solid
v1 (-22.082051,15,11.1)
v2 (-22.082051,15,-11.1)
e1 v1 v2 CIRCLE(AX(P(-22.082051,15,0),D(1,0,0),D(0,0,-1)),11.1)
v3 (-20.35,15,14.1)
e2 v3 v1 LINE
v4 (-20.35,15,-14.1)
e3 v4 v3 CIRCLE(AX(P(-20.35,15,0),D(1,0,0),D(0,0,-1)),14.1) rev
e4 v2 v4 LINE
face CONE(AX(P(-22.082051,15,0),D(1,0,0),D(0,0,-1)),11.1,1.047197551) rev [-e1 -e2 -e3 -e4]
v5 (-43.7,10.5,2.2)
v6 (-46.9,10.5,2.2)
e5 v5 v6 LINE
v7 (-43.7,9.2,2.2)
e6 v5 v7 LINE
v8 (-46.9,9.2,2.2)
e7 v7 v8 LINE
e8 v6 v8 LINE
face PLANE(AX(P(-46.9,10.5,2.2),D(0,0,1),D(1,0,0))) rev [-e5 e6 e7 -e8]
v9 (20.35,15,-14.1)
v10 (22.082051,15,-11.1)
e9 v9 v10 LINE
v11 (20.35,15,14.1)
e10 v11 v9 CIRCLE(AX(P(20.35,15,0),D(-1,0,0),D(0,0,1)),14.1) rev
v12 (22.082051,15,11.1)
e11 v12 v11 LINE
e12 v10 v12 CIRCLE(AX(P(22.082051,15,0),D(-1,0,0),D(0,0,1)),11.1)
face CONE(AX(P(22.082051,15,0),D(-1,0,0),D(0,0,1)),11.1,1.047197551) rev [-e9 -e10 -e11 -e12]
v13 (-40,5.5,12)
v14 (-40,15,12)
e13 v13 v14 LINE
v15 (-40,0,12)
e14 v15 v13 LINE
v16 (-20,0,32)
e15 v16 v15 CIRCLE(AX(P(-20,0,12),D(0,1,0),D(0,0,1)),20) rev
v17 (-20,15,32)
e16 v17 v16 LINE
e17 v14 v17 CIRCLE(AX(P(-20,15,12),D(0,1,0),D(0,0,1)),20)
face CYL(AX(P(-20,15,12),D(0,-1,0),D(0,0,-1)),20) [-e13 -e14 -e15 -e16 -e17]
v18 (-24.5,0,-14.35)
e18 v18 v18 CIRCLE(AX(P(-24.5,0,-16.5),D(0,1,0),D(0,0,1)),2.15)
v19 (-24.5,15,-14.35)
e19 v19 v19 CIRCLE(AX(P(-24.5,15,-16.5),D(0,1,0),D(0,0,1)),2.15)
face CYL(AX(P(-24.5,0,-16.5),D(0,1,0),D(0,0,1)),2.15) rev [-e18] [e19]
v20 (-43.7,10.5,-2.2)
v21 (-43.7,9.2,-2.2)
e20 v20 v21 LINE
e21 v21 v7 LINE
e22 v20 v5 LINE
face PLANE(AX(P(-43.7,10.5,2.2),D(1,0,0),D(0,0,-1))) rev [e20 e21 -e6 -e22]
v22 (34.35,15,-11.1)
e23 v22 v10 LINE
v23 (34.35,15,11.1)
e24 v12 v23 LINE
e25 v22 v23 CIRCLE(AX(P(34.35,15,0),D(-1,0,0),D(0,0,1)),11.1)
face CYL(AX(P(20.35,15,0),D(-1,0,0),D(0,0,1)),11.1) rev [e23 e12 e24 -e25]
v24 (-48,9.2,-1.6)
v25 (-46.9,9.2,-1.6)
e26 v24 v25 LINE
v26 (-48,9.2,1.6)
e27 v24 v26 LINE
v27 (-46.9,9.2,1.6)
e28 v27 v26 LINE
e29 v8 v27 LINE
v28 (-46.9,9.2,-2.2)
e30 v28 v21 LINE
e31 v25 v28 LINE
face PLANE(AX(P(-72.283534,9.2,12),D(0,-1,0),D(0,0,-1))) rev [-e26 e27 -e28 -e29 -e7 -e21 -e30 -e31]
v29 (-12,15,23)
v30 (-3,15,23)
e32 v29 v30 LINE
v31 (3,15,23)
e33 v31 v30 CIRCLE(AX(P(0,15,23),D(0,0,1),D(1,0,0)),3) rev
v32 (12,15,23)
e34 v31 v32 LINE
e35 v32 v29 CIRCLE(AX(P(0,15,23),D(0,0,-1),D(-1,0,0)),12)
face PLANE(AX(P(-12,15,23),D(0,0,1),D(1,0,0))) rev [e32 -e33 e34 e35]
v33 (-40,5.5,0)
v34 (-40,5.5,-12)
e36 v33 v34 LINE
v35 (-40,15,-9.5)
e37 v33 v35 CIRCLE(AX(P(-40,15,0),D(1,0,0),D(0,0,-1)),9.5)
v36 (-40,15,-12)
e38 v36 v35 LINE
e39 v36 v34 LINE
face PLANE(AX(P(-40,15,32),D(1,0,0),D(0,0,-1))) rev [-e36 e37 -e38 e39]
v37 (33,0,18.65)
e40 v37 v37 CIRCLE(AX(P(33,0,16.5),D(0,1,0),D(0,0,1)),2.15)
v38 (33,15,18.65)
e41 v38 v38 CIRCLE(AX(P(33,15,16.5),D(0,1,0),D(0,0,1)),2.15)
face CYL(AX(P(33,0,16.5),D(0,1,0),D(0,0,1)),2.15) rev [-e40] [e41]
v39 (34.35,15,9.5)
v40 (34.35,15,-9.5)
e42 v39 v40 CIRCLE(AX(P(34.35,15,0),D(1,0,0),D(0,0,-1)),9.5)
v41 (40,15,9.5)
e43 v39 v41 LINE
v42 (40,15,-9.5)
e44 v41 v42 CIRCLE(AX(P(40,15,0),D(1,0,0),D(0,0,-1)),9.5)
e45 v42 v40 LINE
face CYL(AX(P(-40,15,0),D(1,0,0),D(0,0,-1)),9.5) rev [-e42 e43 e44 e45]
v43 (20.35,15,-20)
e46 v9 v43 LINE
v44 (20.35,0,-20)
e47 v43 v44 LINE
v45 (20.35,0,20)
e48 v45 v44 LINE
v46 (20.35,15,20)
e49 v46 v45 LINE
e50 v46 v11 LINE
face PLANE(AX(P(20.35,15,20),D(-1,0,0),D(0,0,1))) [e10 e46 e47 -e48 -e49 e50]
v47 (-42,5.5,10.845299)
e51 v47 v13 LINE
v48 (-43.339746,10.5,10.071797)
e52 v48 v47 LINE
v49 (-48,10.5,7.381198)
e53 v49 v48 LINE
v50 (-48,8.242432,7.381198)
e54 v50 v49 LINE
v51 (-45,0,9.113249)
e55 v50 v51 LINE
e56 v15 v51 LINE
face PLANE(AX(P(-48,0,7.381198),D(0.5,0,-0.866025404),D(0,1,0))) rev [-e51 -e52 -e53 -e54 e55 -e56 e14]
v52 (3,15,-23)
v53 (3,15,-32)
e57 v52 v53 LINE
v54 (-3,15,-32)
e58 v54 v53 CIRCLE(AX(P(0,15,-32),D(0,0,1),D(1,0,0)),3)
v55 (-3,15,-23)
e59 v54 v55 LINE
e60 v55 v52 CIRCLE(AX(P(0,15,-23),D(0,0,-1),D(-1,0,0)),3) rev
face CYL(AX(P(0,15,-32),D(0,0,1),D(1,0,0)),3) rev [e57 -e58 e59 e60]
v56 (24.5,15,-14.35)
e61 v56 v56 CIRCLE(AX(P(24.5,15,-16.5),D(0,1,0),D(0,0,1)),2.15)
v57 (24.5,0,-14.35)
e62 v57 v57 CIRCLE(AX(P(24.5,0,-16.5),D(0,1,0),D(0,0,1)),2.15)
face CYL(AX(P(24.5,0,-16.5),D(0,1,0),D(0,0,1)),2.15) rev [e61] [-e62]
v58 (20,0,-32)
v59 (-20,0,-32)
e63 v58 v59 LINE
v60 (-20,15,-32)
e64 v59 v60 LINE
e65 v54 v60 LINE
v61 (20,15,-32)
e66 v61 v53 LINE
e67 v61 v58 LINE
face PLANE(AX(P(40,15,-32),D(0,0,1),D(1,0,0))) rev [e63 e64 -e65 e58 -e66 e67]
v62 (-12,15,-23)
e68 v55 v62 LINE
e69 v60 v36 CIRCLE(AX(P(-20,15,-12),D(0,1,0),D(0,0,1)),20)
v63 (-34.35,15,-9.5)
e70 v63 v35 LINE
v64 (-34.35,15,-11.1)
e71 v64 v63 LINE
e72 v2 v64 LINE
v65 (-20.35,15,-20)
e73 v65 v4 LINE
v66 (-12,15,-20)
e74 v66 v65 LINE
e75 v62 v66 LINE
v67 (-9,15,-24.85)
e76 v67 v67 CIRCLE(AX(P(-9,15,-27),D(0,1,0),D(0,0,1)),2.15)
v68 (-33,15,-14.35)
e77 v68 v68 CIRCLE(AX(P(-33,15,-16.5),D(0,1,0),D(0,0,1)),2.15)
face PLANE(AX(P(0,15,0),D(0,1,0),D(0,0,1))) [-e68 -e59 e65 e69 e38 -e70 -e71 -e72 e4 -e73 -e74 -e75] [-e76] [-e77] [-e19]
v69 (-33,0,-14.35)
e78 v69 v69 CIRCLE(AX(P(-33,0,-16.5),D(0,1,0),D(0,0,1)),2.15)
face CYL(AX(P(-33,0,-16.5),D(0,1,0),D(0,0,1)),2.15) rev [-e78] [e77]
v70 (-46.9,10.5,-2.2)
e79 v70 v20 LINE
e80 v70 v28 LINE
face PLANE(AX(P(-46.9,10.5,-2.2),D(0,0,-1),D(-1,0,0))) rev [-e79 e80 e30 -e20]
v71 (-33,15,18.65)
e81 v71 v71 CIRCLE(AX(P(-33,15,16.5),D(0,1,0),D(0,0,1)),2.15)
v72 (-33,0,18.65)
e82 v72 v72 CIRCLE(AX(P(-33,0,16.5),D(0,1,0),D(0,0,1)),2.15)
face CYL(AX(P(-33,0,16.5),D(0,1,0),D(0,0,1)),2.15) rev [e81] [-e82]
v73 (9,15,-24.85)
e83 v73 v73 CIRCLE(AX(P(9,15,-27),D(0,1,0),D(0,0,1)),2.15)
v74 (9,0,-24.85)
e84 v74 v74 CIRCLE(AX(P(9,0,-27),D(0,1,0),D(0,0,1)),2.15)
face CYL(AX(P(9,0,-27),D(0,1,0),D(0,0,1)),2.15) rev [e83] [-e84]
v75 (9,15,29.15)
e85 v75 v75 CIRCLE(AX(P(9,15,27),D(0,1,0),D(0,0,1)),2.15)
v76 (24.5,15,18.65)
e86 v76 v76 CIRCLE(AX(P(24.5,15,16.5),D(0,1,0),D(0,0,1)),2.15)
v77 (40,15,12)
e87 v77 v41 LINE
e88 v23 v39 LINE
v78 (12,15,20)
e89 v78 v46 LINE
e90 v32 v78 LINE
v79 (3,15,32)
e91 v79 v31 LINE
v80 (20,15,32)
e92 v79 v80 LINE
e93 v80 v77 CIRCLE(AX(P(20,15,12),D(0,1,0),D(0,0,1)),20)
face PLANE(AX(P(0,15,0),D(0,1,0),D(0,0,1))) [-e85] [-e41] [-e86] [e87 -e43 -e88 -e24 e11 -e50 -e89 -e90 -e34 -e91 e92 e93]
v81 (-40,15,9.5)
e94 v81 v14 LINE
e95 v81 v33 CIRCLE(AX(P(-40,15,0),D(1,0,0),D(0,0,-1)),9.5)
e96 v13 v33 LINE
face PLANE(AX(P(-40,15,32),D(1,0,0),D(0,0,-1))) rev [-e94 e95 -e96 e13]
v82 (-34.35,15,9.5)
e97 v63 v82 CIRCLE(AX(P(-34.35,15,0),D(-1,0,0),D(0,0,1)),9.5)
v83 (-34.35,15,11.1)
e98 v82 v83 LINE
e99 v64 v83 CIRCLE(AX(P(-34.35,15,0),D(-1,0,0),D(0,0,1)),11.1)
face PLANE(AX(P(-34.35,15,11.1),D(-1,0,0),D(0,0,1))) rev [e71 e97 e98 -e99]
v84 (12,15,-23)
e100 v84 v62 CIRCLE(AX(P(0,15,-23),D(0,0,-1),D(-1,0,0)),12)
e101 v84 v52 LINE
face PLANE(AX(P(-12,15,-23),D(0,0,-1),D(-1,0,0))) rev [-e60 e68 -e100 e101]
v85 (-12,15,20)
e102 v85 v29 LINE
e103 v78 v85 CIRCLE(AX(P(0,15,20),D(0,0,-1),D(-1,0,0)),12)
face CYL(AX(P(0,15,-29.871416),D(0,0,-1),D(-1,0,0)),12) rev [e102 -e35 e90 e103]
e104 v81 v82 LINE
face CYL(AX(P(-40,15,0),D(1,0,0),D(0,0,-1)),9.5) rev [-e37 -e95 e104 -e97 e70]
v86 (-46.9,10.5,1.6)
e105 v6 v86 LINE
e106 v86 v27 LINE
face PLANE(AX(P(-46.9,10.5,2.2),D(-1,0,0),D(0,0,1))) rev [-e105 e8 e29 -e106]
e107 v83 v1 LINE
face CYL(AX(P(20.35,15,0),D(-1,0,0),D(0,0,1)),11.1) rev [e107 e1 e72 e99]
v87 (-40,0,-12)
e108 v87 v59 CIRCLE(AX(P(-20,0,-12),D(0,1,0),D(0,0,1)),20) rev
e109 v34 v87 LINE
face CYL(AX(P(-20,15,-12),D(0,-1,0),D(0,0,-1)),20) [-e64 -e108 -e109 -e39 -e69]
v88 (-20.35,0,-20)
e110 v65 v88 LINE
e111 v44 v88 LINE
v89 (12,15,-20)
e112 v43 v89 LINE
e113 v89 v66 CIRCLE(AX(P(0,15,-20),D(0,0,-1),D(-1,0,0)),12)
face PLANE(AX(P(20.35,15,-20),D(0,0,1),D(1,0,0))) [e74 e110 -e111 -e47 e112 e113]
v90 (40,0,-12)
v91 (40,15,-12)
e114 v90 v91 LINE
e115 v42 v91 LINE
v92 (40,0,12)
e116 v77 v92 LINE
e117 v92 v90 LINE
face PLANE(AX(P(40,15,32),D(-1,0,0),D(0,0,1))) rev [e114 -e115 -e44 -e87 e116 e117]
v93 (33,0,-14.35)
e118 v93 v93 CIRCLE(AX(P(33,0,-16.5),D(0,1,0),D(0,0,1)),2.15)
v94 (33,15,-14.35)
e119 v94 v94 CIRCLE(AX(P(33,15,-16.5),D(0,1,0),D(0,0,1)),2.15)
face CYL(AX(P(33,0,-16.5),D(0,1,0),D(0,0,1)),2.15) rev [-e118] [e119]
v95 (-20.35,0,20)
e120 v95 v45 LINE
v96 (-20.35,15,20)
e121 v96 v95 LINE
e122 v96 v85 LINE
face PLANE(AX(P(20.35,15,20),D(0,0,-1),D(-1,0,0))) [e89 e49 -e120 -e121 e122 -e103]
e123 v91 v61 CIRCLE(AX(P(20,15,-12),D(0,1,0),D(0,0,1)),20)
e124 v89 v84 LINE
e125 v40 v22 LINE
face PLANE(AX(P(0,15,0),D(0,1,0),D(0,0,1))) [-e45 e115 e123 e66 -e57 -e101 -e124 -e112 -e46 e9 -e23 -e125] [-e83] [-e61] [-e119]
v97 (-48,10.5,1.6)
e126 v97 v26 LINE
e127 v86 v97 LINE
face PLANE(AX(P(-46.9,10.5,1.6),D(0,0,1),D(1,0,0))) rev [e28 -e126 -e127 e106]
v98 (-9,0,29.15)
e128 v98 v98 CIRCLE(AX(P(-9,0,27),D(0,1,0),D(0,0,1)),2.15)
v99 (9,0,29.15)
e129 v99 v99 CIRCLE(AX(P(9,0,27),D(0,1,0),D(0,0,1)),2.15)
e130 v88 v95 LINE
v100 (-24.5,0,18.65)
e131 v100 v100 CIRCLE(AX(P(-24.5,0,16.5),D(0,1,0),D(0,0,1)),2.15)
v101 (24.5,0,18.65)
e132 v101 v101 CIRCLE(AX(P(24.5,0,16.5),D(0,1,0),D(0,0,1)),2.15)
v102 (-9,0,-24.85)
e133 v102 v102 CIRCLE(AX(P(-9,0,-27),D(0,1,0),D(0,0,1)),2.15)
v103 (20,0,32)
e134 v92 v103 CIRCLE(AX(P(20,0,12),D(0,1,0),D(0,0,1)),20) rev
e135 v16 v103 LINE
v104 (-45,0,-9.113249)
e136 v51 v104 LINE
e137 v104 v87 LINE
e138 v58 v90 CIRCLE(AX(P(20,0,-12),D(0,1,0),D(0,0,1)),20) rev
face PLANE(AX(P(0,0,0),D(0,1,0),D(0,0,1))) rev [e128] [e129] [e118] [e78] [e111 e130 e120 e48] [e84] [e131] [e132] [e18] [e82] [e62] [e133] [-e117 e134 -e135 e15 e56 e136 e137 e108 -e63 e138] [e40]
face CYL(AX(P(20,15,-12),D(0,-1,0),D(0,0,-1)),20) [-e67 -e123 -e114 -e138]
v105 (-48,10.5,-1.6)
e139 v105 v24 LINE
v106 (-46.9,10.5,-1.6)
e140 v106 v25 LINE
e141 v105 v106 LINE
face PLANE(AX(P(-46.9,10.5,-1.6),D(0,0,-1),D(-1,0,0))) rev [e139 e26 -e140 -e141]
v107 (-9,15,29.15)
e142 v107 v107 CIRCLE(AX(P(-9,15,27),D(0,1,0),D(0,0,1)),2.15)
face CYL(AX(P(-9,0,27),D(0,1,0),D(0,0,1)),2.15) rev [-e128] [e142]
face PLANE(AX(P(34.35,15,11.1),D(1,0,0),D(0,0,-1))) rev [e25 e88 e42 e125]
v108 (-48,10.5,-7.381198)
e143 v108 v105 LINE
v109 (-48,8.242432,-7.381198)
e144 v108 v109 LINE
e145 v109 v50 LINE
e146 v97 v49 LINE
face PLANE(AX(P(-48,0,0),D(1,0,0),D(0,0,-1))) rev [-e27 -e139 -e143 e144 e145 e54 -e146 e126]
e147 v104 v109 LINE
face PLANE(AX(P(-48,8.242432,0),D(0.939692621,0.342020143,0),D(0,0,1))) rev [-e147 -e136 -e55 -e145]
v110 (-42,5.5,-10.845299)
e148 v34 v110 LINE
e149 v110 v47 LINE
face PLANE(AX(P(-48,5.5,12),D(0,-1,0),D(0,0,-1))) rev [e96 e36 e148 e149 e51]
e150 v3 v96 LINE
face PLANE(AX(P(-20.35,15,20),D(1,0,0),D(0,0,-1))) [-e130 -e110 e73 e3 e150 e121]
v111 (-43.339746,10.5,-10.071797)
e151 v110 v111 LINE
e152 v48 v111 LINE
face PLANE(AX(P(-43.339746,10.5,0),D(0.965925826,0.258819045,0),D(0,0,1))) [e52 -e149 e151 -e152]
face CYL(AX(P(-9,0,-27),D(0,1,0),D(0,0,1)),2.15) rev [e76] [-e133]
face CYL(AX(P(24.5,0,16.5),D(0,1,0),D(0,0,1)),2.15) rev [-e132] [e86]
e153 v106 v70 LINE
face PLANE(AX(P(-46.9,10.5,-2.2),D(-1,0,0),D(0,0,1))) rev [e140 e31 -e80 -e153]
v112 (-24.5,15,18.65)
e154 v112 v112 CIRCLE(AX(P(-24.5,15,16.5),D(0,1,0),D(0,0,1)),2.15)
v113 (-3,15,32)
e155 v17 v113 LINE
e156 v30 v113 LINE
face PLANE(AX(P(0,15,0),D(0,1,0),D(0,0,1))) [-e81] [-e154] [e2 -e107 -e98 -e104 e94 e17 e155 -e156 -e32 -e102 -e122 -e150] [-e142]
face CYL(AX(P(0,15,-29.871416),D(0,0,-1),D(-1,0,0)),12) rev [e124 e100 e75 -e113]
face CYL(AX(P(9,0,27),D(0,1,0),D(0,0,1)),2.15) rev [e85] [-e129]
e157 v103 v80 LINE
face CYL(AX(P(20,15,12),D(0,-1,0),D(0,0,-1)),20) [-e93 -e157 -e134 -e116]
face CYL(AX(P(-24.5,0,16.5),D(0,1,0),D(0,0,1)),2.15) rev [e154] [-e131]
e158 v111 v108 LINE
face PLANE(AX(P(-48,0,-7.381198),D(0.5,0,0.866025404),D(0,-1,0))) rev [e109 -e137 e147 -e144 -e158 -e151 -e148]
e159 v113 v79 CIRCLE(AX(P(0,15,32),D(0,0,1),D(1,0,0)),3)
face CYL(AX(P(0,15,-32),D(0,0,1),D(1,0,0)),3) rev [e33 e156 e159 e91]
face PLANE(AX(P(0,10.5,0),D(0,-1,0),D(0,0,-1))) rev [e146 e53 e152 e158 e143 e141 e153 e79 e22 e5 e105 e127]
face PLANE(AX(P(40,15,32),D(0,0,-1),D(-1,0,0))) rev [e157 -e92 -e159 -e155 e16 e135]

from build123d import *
from OCP.BRepFilletAPI import BRepFilletAPI_MakeChamfer

# Parameters (mm, degrees)
SKETCH1_W           = 80
SKETCH1_H           = 64
SKETCH1_W_2         = 40.7
SKETCH1_H_2         = 40
BOSS_EXTRUDE1_DEPTH = 15
SKETCH3_W           = 14
SKETCH3_H           = 11.1
SKETCH4_R           = 9.5
CUT_EXTRUDE2_DEPTH  = 88.458561616
SKETCH5_R           = 3
CUT_EXTRUDE3_DEPTH  = 77.948034413
SKETCH8_R           = 2.15
CUT_EXTRUDE6_DEPTH  = 54.37602458
FILLET1_R           = 20
CHAMFER1_SIZE       = 3
CHAMFER1_SIZE2      = 1.732050808
SKETCH9_W           = 12
SKETCH9_H           = 3
SKETCH10_W          = 24
SKETCH10_H          = 5.5
BOSS_EXTRUDE2_DEPTH = 8
BOSS_EXTRUDE3_START = 2
SKETCH12_W          = 24
SKETCH12_H          = 3.7
BOSS_EXTRUDE3_DEPTH = 6
BOSS_EXTRUDE4_DEPTH = 1.3
CHAMFER2_SIZE2      = 1.339745962
CHAMFER2_SIZE       = 5
CHAMFER3_SIZE       = 8
CHAMFER3_SIZE_2     = 4.618802154
CHAMFER4_SIZE       = 3
CHAMFER4_SIZE2      = 8.242432258


with BuildPart() as part:
    # Sketch1 → Boss-Extrude1 (new body)
    with BuildSketch(Plane(origin=(0, 0, 0), x_dir=(1, 0, 0), z_dir=(0, 1, 0))):
        Rectangle(SKETCH1_W, SKETCH1_H)
        Rectangle(SKETCH1_W_2, SKETCH1_H_2, mode=Mode.SUBTRACT)
    extrude(amount=BOSS_EXTRUDE1_DEPTH)

    # Sketch3 → Cut-Revolve1 (revolve, cut)
    with BuildSketch(Plane(origin=(0, 15, 0), x_dir=(1, 0, 0), z_dir=(0, 1, 0))):
        with Locations((27.35, -5.55)):
            Rectangle(SKETCH3_W, SKETCH3_H)
        with Locations((-27.35, -5.55)):
            Rectangle(SKETCH3_W, SKETCH3_H)
    revolve(axis=Axis((20.35, 15, 0), (1, 0, 0)), mode=Mode.SUBTRACT)

    # Sketch4 → Cut-Extrude2 (cut, through all)
    with BuildSketch(Plane(origin=(40, 0, 0), x_dir=(0, 0, -1), z_dir=(1, 0, 0))):
        with Locations((0, 15)):
            Circle(SKETCH4_R)
    extrude(amount=-CUT_EXTRUDE2_DEPTH, mode=Mode.SUBTRACT)

    # Sketch5 → Cut-Extrude3 (cut, through all)
    with BuildSketch(Plane.XY.offset(32)):
        with Locations((0, 15)):
            Circle(SKETCH5_R)
    extrude(amount=-CUT_EXTRUDE3_DEPTH, mode=Mode.SUBTRACT)

    # Sketch8 → Cut-Extrude6 (cut, through all)
    with BuildSketch(Plane(origin=(0, 15, 0), x_dir=(1, 0, 0), z_dir=(0, 1, 0))):
        with Locations(Location((24.5, 16.5, 0), (0, 0, 270))):
            Circle(SKETCH8_R)
        with Locations(Location((24.5, -16.5, 0), (0, 0, 270))):
            Circle(SKETCH8_R)
        with Locations(Location((-24.5, -16.5, 0), (0, 0, 270))):
            Circle(SKETCH8_R)
        with Locations(Location((-24.5, 16.5, 0), (0, 0, 270))):
            Circle(SKETCH8_R)
        with Locations(Location((9, -27, 0), (0, 0, 270))):
            Circle(SKETCH8_R)
        with Locations(Location((-9, -27, 0), (0, 0, 270))):
            Circle(SKETCH8_R)
        with Locations(Location((-9, 27, 0), (0, 0, 270))):
            Circle(SKETCH8_R)
        with Locations(Location((9, 27, 0), (0, 0, 270))):
            Circle(SKETCH8_R)
        with Locations(Location((-33, 16.5, 0), (0, 0, 270))):
            Circle(SKETCH8_R)
        with Locations(Location((-33, -16.5, 0), (0, 0, 270))):
            Circle(SKETCH8_R)
        with Locations(Location((33, -16.5, 0), (0, 0, 270))):
            Circle(SKETCH8_R)
        with Locations(Location((33, 16.5, 0), (0, 0, 270))):
            Circle(SKETCH8_R)
    extrude(amount=-CUT_EXTRUDE6_DEPTH, mode=Mode.SUBTRACT)

    # Fillet1
    fillet1_edges = [part.edges().sort_by_distance(p)[0] for p in [
        (-40, 7.5, -32),
        (40, 7.5, -32),
        (40, 7.5, 32),
        (-40, 7.5, 32),
    ]]
    fillet(fillet1_edges, radius=FILLET1_R)

    # Chamfer1: one chamfer whose edges measure the first distance from different faces: ONE call of the kernel's chamfer builder (chamfer() names one face for all edges)
    chamfer1_edges_1 = [part.edges().sort_by_distance(p)[0] for p in [
        (20.35, 3.9, 0),
    ]]
    chamfer1_side_1 = [part.faces().sort_by_distance(p)[0] for p in [
        (20.35, 0.427200187, 0),
    ]]
    chamfer1_edges_2 = [part.edges().sort_by_distance(p)[0] for p in [
        (-20.35, 3.9, 0),
    ]]
    chamfer1_side_2 = [part.faces().sort_by_distance(p)[0] for p in [
        (-20.35, 0.427200187, 0),
    ]]
    chamfer1 = BRepFilletAPI_MakeChamfer(part.part.solid().wrapped)
    for e in chamfer1_edges_1:
        chamfer1.Add(CHAMFER1_SIZE, CHAMFER1_SIZE2, e.wrapped, chamfer1_side_1[0].wrapped)  # the first distance lies on this face
    for e in chamfer1_edges_2:
        chamfer1.Add(CHAMFER1_SIZE, CHAMFER1_SIZE2, e.wrapped, chamfer1_side_2[0].wrapped)  # the first distance lies on this face
    add(Compound.cast(chamfer1.Shape()), mode=Mode.REPLACE)

    # Sketch9 → Cut-Revolve2 (revolve, cut)
    with BuildSketch(Plane(origin=(0, 15, 0), x_dir=(1, 0, 0), z_dir=(0, 1, 0))):
        with Locations((-6, -21.5)):
            Rectangle(SKETCH9_W, SKETCH9_H)
        with Locations((-6, 21.5)):
            Rectangle(SKETCH9_W, SKETCH9_H)
    revolve(axis=Axis((0, 15, -29.871415895), (0, 0, 1)), mode=Mode.SUBTRACT)

    # Sketch10 → Boss-Extrude2 (add)
    with BuildSketch(Plane.ZY.offset(40)):
        with Locations((0, 2.75)):
            Rectangle(SKETCH10_W, SKETCH10_H)
    extrude(amount=BOSS_EXTRUDE2_DEPTH)

    # Sketch12 → Boss-Extrude3 (add)
    with BuildSketch(Plane.ZY.offset(40).offset(BOSS_EXTRUDE3_START)):
        with Locations((0, 7.35)):
            Rectangle(SKETCH12_W, SKETCH12_H)
    extrude(amount=BOSS_EXTRUDE3_DEPTH)

    # Sketch13 → Boss-Extrude4 (add)
    with BuildSketch(Plane(origin=(0, 9.2, 0), x_dir=(1, 0, 0), z_dir=(0, 1, 0))):
        Polygon((-46.9, 2.2), (-46.9, 1.6), (-48, 1.6), (-48, 12), (-42, 12), (-42, -12), (-48, -12), (-48, -1.6), (-46.9, -1.6), (-46.9, -2.2), (-43.7, -2.2), (-43.7, 2.2), align=None)
    extrude(amount=BOSS_EXTRUDE4_DEPTH)

    # Chamfer2
    chamfer2_edges = [part.edges().sort_by_distance(p)[0] for p in [
        (-42, 10.5, 0),
    ]]
    chamfer2_side = [part.faces().sort_by_distance(p)[0] for p in [
        (-42, 10.473205081, 0),
    ]]
    chamfer(chamfer2_edges, length=CHAMFER2_SIZE - 0.0001, length2=CHAMFER2_SIZE2 - 0.0001, reference=chamfer2_side[0])  # a hair under: the kernel refuses the full size

    # Chamfer3
    chamfer3_edges_1 = [part.edges().sort_by_distance(p)[0] for p in [
        (-48, 5.25, 12),
    ]]
    chamfer3_side_1 = [part.faces().sort_by_distance(p)[0] for p in [
        (-47.907623957, 5.25, 12),
    ]]
    chamfer3_edges_2 = [part.edges().sort_by_distance(p)[0] for p in [
        (-48, 5.25, -12),
    ]]
    chamfer3_side_2 = [part.faces().sort_by_distance(p)[0] for p in [
        (-47.907623957, 5.25, -12),
    ]]
    chamfer3 = BRepFilletAPI_MakeChamfer(part.part.solid().wrapped)
    for e in chamfer3_edges_1:
        chamfer3.Add(CHAMFER3_SIZE - 0.0001, CHAMFER3_SIZE_2 - 0.0001, e.wrapped, chamfer3_side_1[0].wrapped)
    for e in chamfer3_edges_2:
        chamfer3.Add(CHAMFER3_SIZE - 0.0001, CHAMFER3_SIZE_2 - 0.0001, e.wrapped, chamfer3_side_2[0].wrapped)
    add(Compound.cast(chamfer3.Shape()), mode=Mode.REPLACE)  # a hair under: the kernel refuses the full size

    # Chamfer4
    chamfer4_edges = [part.edges().sort_by_distance(p)[0] for p in [
        (-48, 0, 0),
    ]]
    chamfer4_side = [part.faces().sort_by_distance(p)[0] for p in [
        (-40.00005, 0, 10.911882359),
    ]]
    chamfer(chamfer4_edges, length=CHAMFER4_SIZE, length2=CHAMFER4_SIZE2, reference=chamfer4_side[0])


solid = part.part
